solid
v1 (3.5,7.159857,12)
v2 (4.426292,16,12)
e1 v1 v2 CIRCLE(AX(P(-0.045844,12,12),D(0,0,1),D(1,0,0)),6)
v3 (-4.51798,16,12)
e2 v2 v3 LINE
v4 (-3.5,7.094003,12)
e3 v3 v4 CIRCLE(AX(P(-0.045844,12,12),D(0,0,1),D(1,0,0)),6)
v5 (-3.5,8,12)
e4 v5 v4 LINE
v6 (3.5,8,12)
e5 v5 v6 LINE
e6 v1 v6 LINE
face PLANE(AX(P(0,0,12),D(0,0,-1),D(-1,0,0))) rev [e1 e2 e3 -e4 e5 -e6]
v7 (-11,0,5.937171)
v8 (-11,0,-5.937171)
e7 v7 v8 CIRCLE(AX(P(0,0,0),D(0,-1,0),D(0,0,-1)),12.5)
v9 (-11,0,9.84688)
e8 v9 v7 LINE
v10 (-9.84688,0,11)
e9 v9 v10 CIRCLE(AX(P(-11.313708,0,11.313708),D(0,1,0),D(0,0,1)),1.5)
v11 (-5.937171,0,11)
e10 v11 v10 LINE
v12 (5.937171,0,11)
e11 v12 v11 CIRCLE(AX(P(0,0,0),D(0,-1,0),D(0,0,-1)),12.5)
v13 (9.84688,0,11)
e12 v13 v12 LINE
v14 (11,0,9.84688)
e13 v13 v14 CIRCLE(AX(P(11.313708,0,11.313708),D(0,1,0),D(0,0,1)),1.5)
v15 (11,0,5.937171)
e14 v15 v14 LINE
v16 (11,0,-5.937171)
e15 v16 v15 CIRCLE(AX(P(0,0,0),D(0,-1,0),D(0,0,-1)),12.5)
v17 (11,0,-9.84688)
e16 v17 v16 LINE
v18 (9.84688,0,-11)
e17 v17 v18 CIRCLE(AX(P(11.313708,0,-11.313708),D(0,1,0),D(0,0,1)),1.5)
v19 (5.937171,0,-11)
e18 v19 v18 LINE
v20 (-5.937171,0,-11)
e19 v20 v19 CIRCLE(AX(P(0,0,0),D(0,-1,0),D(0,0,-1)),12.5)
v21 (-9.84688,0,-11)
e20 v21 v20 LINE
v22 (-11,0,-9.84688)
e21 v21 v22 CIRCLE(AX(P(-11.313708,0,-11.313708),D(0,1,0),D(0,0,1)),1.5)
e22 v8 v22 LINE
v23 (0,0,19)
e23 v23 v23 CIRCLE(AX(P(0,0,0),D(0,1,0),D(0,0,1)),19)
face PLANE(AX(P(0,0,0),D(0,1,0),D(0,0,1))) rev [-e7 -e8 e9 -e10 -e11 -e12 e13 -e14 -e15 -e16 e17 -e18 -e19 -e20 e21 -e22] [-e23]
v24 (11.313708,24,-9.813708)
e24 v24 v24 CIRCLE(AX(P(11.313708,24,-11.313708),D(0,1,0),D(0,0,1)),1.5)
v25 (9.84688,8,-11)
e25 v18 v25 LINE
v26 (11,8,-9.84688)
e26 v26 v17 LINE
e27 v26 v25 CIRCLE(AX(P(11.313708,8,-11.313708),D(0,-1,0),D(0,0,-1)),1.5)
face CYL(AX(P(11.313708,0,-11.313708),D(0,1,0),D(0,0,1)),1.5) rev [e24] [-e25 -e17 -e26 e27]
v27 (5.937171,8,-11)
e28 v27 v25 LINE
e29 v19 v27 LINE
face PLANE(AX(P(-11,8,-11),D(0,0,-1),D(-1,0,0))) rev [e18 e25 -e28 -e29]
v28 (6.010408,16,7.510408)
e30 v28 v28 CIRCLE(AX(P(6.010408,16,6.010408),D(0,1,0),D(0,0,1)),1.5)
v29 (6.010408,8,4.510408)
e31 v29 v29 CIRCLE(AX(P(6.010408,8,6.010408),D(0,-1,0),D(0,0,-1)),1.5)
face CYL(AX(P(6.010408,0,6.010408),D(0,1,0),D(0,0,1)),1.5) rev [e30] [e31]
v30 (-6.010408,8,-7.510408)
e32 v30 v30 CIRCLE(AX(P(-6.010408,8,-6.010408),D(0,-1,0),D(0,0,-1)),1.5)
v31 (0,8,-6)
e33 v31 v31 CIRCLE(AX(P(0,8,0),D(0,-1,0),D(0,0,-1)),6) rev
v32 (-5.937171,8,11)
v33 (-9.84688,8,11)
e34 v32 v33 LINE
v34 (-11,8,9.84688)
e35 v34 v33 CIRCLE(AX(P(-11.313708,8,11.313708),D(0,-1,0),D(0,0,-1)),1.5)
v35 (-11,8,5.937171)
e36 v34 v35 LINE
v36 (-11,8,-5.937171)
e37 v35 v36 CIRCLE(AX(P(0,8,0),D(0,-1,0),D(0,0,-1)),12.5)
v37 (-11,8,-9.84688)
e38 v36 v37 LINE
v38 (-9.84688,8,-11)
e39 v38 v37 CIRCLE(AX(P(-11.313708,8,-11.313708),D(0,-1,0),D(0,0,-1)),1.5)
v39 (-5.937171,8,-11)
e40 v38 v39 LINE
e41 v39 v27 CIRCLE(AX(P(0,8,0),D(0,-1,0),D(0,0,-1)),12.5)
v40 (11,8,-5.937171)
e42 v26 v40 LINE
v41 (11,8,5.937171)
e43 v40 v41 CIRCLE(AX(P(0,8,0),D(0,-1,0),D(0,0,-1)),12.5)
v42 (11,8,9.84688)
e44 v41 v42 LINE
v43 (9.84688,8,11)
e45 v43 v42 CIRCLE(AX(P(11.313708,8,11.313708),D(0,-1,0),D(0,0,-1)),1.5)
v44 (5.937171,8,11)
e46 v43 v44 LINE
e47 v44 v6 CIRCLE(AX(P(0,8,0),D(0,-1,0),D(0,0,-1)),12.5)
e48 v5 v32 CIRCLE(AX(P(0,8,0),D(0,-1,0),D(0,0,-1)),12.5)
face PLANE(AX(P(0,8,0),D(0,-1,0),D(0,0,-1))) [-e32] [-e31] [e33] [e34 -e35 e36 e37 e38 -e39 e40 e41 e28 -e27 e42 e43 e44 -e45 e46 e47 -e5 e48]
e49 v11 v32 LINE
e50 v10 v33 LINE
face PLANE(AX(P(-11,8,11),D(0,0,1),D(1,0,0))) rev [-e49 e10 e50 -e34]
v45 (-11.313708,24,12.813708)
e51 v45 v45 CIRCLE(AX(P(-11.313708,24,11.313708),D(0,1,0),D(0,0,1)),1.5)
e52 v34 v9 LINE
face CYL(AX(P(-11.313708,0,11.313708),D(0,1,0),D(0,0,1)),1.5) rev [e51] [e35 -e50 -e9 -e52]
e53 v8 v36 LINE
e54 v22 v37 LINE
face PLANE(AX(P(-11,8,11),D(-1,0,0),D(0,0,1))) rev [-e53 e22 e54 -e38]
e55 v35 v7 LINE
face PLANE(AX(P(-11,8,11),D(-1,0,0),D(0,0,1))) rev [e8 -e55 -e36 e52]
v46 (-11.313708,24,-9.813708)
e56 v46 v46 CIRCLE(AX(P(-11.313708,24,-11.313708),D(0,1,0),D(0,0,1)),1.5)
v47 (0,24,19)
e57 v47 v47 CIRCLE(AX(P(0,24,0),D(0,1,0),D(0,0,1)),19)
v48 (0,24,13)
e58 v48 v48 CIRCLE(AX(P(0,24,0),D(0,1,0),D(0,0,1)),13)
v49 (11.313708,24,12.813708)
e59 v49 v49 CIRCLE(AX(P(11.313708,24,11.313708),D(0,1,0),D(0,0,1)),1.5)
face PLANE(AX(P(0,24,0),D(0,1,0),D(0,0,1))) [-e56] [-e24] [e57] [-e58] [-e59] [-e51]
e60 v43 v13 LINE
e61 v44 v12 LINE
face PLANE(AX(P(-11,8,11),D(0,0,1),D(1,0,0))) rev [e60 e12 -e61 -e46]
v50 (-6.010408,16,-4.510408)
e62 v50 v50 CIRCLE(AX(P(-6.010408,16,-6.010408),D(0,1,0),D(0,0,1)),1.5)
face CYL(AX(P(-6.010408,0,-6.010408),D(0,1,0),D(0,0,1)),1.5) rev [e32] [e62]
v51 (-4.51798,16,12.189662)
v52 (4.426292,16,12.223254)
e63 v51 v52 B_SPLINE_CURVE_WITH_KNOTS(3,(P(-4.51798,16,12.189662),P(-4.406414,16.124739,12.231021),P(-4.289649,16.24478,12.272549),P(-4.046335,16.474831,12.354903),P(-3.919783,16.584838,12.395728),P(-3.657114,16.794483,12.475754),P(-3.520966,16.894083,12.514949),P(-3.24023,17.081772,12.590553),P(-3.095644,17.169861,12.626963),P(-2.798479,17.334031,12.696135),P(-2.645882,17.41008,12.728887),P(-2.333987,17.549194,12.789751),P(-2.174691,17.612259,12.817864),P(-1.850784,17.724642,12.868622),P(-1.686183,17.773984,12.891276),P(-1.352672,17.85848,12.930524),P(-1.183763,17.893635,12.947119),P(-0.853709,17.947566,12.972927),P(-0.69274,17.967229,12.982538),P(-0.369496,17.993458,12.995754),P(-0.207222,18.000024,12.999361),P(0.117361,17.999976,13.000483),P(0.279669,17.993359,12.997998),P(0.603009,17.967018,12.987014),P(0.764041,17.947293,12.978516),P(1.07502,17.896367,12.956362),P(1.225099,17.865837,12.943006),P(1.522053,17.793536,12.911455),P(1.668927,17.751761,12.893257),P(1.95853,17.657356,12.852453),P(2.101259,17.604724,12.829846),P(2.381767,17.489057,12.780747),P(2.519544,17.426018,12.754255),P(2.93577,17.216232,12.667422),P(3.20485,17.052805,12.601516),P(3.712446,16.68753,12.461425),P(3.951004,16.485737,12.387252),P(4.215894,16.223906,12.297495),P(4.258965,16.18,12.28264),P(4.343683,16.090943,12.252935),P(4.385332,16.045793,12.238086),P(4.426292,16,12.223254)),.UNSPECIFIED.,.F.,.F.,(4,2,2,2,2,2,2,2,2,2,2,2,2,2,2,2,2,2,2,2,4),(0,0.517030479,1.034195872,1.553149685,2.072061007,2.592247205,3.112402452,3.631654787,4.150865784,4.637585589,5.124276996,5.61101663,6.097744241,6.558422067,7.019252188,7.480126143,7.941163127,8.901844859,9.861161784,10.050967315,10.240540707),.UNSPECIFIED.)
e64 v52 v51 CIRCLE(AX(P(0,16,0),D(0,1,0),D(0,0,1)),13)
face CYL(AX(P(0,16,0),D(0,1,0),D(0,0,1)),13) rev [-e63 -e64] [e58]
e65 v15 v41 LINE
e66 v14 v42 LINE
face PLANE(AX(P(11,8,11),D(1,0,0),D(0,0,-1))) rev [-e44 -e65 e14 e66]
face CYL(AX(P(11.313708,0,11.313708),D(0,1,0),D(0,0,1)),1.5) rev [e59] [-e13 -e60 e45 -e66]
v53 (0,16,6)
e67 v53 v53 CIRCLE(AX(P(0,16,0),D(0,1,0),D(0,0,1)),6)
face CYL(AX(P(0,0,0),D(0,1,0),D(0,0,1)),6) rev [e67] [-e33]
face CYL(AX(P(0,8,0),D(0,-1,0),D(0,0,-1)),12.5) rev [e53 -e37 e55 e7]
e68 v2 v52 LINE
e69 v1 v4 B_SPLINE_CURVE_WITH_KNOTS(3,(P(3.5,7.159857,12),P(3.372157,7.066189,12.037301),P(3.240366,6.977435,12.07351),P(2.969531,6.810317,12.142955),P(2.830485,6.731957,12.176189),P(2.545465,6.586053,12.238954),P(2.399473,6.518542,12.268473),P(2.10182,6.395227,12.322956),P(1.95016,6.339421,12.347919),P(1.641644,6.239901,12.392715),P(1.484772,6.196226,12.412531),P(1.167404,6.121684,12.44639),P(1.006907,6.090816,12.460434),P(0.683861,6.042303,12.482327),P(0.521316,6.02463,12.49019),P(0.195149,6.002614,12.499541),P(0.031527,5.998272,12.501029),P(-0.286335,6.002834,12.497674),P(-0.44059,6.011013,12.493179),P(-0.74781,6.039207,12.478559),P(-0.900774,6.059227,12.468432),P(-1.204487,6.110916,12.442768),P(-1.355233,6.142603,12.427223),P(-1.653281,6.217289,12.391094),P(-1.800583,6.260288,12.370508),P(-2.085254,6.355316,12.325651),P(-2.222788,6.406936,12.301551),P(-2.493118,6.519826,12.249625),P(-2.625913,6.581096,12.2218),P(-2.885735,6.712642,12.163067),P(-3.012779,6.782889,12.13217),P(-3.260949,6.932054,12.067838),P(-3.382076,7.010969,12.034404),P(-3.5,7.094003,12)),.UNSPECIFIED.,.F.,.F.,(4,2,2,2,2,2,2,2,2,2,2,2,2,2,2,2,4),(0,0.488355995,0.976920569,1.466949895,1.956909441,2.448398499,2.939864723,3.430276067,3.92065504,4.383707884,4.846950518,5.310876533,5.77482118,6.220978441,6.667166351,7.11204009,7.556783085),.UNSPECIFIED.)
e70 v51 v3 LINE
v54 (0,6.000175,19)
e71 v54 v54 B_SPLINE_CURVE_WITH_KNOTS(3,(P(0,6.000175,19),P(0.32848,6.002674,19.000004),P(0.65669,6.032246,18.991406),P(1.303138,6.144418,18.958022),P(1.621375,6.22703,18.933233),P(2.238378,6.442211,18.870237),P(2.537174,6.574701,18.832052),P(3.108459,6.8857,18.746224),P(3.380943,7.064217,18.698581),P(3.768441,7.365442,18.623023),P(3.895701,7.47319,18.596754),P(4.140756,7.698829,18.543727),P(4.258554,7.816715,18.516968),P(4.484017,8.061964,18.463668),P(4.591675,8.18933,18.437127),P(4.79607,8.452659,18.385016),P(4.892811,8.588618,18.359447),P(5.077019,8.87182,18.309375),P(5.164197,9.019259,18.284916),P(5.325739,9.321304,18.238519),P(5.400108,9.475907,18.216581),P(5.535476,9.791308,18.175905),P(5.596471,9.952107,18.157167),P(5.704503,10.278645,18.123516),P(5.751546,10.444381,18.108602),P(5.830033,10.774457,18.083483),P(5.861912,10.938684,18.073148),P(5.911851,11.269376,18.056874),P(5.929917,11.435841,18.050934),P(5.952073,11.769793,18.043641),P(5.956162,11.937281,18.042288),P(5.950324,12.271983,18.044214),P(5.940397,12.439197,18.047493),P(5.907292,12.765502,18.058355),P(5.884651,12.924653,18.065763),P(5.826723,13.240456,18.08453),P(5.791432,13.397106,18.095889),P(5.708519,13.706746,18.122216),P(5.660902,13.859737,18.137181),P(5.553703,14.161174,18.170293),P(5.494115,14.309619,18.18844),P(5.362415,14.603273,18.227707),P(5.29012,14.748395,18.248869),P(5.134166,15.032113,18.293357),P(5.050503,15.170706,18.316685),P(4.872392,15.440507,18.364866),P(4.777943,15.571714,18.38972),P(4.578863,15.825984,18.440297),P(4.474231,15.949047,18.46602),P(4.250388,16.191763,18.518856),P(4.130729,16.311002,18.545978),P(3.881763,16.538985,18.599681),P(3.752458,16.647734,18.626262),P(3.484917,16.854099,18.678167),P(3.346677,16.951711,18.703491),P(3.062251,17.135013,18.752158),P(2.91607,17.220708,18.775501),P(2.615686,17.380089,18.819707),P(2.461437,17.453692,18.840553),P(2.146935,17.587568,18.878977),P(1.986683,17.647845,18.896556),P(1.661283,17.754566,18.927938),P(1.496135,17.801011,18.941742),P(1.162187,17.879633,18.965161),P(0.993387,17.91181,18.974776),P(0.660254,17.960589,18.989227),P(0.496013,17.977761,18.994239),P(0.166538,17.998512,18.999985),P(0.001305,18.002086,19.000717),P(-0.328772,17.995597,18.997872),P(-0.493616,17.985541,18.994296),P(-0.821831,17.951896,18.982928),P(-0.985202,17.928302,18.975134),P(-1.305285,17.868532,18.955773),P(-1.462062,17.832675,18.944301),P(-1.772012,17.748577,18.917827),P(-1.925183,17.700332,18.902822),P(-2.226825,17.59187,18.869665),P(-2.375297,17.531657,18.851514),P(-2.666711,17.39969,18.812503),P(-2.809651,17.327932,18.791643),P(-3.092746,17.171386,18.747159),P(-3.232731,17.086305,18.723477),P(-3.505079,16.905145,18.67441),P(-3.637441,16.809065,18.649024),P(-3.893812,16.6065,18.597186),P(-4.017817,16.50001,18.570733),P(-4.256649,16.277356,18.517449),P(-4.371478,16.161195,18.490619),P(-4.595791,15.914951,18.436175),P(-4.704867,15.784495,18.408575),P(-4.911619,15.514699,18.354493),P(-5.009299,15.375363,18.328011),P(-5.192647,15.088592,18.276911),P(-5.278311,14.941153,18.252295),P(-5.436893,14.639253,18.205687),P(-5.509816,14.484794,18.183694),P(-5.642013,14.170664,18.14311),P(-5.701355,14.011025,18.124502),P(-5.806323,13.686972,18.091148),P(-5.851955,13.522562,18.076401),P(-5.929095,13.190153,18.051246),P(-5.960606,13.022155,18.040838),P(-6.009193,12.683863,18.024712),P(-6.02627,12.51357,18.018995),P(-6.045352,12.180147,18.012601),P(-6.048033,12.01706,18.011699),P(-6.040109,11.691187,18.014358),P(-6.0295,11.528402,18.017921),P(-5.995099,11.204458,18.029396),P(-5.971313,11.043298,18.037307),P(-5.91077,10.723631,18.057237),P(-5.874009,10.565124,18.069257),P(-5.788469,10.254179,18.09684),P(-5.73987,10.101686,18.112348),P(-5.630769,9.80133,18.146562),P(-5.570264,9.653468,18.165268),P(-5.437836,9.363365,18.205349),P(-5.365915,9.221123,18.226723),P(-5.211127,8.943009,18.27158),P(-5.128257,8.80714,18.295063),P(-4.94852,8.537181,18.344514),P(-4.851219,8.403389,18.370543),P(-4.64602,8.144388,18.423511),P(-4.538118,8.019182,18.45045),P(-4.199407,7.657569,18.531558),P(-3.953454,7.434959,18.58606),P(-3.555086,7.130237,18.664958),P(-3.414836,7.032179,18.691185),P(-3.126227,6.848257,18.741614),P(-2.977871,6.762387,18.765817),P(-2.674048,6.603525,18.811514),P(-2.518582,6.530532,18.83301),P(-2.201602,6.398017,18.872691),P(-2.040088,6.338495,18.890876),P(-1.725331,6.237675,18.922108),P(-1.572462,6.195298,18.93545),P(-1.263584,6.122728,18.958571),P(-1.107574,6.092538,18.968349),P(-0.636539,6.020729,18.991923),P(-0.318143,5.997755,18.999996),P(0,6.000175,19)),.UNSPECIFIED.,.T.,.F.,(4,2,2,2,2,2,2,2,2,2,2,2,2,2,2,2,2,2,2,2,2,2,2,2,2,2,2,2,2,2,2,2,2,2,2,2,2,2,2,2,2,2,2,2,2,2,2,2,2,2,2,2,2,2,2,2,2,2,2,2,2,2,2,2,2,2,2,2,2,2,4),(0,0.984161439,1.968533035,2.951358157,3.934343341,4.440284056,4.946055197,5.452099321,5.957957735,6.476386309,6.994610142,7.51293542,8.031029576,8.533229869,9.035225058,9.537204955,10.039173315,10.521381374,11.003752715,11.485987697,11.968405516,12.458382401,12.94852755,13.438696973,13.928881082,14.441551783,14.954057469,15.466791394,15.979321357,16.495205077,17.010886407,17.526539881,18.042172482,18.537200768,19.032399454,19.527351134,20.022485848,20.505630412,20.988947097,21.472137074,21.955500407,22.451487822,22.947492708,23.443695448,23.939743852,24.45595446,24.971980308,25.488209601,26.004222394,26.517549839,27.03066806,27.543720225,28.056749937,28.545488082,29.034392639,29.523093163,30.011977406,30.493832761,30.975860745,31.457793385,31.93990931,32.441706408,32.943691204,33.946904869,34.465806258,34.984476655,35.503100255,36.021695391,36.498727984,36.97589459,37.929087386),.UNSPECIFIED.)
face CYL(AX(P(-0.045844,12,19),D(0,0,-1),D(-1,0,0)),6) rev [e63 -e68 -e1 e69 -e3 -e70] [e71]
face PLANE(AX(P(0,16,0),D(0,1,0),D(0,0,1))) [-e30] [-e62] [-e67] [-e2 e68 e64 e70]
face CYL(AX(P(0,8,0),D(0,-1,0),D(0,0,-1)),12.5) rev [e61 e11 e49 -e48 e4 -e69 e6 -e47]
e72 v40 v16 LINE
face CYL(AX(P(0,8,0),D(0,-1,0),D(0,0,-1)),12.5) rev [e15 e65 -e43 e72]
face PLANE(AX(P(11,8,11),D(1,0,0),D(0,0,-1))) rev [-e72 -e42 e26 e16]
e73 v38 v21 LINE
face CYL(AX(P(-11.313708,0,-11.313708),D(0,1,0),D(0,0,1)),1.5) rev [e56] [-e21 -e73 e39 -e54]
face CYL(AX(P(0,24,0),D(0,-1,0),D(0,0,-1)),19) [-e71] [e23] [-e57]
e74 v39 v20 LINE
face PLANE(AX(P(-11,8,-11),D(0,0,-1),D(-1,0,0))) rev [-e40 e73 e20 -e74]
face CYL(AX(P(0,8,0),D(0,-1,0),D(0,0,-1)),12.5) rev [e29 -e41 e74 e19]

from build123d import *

# Parameters (mm, degrees)
SKETCH1_R              = 19
BOSS_EXTRUDE1_DEPTH    = 24
SKETCH2_R              = 13
CUT_EXTRUDE1_DEPTH     = 8
SKETCH3_R              = 6
CUT_EXTRUDE2_DEPTH     = 32.272991542
SKETCH4_R              = 12.5
CUT_EXTRUDE3_DEPTH     = 8
SKETCH5_W              = 22
SKETCH5_H              = 22
CUT_EXTRUDE4_DEPTH     = 8
CUT_EXTRUDE5_START     = 12
CUT_EXTRUDE5_OUTLINE_R = 6
CUT_EXTRUDE5_DEPTH     = 7.000000101
SKETCH6_R              = 1.5
CUT_EXTRUDE6_DEPTH     = 32.272991715
SKETCH7_R              = 1.5
CUT_EXTRUDE7_DEPTH     = 24


# Read off the part's stored shape, not the designer's step: Cut-Extrude5
with BuildPart() as part:
    # Sketch1 → Boss-Extrude1 (new body)
    with BuildSketch(Plane(origin=(0, 0, 0), x_dir=(1, 0, 0), z_dir=(0, 1, 0))):
        with Locations(Location((0, 0, 0), (0, 0, 270))):
            Circle(SKETCH1_R)
    extrude(amount=BOSS_EXTRUDE1_DEPTH)

    # Sketch2 → Cut-Extrude1 (cut)
    with BuildSketch(Plane(origin=(0, 24, 0), x_dir=(1, 0, 0), z_dir=(0, 1, 0))):
        with Locations(Location((0, 0, 0), (0, 0, 270))):
            Circle(SKETCH2_R)
    extrude(amount=-CUT_EXTRUDE1_DEPTH, mode=Mode.SUBTRACT)

    # Sketch3 → Cut-Extrude2 (cut, through all)
    with BuildSketch(Plane(origin=(0, 16, 0), x_dir=(1, 0, 0), z_dir=(0, 1, 0))):
        with Locations(Location((0, 0, 0), (0, 0, 270))):
            Circle(SKETCH3_R)
    extrude(amount=-CUT_EXTRUDE2_DEPTH, mode=Mode.SUBTRACT)

    # Sketch4 → Cut-Extrude3 (cut)
    with BuildSketch(Plane.XZ):
        with Locations(Location((0, 0, 0), (0, 0, 270))):
            Circle(SKETCH4_R)
    extrude(amount=-CUT_EXTRUDE3_DEPTH, mode=Mode.SUBTRACT)

    # Sketch5 → Cut-Extrude4 (cut)
    with BuildSketch(Plane.XZ):
        Rectangle(SKETCH5_W, SKETCH5_H)
    extrude(amount=-CUT_EXTRUDE4_DEPTH, mode=Mode.SUBTRACT)

    # Cut-Extrude5 outline → Cut-Extrude5 (cut)
    with BuildSketch(Plane.XY.offset(CUT_EXTRUDE5_START)):
        with Locations((-0.045844334, 12)):
            Circle(CUT_EXTRUDE5_OUTLINE_R)
    extrude(amount=CUT_EXTRUDE5_DEPTH, mode=Mode.SUBTRACT)

    # Sketch6 → Cut-Extrude6 (cut, through all)
    with BuildSketch(Plane(origin=(0, 16, 0), x_dir=(1, 0, 0), z_dir=(0, 1, 0))):
        with Locations(Location((-6.01040764, 6.01040764, 0), (0, 0, 270))):
            Circle(SKETCH6_R)
        with Locations(Location((6.01040764, -6.01040764, 0), (0, 0, 270))):
            Circle(SKETCH6_R)
    extrude(amount=-CUT_EXTRUDE6_DEPTH, mode=Mode.SUBTRACT)

    # Sketch7 → Cut-Extrude7 (cut)
    with BuildSketch(Plane(origin=(0, 24, 0), x_dir=(1, 0, 0), z_dir=(0, 1, 0))):
        with Locations(Location((11.313708499, -11.313708499, 0), (0, 0, 270))):
            Circle(SKETCH7_R)
        with Locations(Location((-11.313708499, -11.313708499, 0), (0, 0, 270))):
            Circle(SKETCH7_R)
        with Locations(Location((-11.313708499, 11.313708499, 0), (0, 0, 270))):
            Circle(SKETCH7_R)
        with Locations(Location((11.313708499, 11.313708499, 0), (0, 0, 270))):
            Circle(SKETCH7_R)
    extrude(amount=-CUT_EXTRUDE7_DEPTH, mode=Mode.SUBTRACT)


solid = part.part
